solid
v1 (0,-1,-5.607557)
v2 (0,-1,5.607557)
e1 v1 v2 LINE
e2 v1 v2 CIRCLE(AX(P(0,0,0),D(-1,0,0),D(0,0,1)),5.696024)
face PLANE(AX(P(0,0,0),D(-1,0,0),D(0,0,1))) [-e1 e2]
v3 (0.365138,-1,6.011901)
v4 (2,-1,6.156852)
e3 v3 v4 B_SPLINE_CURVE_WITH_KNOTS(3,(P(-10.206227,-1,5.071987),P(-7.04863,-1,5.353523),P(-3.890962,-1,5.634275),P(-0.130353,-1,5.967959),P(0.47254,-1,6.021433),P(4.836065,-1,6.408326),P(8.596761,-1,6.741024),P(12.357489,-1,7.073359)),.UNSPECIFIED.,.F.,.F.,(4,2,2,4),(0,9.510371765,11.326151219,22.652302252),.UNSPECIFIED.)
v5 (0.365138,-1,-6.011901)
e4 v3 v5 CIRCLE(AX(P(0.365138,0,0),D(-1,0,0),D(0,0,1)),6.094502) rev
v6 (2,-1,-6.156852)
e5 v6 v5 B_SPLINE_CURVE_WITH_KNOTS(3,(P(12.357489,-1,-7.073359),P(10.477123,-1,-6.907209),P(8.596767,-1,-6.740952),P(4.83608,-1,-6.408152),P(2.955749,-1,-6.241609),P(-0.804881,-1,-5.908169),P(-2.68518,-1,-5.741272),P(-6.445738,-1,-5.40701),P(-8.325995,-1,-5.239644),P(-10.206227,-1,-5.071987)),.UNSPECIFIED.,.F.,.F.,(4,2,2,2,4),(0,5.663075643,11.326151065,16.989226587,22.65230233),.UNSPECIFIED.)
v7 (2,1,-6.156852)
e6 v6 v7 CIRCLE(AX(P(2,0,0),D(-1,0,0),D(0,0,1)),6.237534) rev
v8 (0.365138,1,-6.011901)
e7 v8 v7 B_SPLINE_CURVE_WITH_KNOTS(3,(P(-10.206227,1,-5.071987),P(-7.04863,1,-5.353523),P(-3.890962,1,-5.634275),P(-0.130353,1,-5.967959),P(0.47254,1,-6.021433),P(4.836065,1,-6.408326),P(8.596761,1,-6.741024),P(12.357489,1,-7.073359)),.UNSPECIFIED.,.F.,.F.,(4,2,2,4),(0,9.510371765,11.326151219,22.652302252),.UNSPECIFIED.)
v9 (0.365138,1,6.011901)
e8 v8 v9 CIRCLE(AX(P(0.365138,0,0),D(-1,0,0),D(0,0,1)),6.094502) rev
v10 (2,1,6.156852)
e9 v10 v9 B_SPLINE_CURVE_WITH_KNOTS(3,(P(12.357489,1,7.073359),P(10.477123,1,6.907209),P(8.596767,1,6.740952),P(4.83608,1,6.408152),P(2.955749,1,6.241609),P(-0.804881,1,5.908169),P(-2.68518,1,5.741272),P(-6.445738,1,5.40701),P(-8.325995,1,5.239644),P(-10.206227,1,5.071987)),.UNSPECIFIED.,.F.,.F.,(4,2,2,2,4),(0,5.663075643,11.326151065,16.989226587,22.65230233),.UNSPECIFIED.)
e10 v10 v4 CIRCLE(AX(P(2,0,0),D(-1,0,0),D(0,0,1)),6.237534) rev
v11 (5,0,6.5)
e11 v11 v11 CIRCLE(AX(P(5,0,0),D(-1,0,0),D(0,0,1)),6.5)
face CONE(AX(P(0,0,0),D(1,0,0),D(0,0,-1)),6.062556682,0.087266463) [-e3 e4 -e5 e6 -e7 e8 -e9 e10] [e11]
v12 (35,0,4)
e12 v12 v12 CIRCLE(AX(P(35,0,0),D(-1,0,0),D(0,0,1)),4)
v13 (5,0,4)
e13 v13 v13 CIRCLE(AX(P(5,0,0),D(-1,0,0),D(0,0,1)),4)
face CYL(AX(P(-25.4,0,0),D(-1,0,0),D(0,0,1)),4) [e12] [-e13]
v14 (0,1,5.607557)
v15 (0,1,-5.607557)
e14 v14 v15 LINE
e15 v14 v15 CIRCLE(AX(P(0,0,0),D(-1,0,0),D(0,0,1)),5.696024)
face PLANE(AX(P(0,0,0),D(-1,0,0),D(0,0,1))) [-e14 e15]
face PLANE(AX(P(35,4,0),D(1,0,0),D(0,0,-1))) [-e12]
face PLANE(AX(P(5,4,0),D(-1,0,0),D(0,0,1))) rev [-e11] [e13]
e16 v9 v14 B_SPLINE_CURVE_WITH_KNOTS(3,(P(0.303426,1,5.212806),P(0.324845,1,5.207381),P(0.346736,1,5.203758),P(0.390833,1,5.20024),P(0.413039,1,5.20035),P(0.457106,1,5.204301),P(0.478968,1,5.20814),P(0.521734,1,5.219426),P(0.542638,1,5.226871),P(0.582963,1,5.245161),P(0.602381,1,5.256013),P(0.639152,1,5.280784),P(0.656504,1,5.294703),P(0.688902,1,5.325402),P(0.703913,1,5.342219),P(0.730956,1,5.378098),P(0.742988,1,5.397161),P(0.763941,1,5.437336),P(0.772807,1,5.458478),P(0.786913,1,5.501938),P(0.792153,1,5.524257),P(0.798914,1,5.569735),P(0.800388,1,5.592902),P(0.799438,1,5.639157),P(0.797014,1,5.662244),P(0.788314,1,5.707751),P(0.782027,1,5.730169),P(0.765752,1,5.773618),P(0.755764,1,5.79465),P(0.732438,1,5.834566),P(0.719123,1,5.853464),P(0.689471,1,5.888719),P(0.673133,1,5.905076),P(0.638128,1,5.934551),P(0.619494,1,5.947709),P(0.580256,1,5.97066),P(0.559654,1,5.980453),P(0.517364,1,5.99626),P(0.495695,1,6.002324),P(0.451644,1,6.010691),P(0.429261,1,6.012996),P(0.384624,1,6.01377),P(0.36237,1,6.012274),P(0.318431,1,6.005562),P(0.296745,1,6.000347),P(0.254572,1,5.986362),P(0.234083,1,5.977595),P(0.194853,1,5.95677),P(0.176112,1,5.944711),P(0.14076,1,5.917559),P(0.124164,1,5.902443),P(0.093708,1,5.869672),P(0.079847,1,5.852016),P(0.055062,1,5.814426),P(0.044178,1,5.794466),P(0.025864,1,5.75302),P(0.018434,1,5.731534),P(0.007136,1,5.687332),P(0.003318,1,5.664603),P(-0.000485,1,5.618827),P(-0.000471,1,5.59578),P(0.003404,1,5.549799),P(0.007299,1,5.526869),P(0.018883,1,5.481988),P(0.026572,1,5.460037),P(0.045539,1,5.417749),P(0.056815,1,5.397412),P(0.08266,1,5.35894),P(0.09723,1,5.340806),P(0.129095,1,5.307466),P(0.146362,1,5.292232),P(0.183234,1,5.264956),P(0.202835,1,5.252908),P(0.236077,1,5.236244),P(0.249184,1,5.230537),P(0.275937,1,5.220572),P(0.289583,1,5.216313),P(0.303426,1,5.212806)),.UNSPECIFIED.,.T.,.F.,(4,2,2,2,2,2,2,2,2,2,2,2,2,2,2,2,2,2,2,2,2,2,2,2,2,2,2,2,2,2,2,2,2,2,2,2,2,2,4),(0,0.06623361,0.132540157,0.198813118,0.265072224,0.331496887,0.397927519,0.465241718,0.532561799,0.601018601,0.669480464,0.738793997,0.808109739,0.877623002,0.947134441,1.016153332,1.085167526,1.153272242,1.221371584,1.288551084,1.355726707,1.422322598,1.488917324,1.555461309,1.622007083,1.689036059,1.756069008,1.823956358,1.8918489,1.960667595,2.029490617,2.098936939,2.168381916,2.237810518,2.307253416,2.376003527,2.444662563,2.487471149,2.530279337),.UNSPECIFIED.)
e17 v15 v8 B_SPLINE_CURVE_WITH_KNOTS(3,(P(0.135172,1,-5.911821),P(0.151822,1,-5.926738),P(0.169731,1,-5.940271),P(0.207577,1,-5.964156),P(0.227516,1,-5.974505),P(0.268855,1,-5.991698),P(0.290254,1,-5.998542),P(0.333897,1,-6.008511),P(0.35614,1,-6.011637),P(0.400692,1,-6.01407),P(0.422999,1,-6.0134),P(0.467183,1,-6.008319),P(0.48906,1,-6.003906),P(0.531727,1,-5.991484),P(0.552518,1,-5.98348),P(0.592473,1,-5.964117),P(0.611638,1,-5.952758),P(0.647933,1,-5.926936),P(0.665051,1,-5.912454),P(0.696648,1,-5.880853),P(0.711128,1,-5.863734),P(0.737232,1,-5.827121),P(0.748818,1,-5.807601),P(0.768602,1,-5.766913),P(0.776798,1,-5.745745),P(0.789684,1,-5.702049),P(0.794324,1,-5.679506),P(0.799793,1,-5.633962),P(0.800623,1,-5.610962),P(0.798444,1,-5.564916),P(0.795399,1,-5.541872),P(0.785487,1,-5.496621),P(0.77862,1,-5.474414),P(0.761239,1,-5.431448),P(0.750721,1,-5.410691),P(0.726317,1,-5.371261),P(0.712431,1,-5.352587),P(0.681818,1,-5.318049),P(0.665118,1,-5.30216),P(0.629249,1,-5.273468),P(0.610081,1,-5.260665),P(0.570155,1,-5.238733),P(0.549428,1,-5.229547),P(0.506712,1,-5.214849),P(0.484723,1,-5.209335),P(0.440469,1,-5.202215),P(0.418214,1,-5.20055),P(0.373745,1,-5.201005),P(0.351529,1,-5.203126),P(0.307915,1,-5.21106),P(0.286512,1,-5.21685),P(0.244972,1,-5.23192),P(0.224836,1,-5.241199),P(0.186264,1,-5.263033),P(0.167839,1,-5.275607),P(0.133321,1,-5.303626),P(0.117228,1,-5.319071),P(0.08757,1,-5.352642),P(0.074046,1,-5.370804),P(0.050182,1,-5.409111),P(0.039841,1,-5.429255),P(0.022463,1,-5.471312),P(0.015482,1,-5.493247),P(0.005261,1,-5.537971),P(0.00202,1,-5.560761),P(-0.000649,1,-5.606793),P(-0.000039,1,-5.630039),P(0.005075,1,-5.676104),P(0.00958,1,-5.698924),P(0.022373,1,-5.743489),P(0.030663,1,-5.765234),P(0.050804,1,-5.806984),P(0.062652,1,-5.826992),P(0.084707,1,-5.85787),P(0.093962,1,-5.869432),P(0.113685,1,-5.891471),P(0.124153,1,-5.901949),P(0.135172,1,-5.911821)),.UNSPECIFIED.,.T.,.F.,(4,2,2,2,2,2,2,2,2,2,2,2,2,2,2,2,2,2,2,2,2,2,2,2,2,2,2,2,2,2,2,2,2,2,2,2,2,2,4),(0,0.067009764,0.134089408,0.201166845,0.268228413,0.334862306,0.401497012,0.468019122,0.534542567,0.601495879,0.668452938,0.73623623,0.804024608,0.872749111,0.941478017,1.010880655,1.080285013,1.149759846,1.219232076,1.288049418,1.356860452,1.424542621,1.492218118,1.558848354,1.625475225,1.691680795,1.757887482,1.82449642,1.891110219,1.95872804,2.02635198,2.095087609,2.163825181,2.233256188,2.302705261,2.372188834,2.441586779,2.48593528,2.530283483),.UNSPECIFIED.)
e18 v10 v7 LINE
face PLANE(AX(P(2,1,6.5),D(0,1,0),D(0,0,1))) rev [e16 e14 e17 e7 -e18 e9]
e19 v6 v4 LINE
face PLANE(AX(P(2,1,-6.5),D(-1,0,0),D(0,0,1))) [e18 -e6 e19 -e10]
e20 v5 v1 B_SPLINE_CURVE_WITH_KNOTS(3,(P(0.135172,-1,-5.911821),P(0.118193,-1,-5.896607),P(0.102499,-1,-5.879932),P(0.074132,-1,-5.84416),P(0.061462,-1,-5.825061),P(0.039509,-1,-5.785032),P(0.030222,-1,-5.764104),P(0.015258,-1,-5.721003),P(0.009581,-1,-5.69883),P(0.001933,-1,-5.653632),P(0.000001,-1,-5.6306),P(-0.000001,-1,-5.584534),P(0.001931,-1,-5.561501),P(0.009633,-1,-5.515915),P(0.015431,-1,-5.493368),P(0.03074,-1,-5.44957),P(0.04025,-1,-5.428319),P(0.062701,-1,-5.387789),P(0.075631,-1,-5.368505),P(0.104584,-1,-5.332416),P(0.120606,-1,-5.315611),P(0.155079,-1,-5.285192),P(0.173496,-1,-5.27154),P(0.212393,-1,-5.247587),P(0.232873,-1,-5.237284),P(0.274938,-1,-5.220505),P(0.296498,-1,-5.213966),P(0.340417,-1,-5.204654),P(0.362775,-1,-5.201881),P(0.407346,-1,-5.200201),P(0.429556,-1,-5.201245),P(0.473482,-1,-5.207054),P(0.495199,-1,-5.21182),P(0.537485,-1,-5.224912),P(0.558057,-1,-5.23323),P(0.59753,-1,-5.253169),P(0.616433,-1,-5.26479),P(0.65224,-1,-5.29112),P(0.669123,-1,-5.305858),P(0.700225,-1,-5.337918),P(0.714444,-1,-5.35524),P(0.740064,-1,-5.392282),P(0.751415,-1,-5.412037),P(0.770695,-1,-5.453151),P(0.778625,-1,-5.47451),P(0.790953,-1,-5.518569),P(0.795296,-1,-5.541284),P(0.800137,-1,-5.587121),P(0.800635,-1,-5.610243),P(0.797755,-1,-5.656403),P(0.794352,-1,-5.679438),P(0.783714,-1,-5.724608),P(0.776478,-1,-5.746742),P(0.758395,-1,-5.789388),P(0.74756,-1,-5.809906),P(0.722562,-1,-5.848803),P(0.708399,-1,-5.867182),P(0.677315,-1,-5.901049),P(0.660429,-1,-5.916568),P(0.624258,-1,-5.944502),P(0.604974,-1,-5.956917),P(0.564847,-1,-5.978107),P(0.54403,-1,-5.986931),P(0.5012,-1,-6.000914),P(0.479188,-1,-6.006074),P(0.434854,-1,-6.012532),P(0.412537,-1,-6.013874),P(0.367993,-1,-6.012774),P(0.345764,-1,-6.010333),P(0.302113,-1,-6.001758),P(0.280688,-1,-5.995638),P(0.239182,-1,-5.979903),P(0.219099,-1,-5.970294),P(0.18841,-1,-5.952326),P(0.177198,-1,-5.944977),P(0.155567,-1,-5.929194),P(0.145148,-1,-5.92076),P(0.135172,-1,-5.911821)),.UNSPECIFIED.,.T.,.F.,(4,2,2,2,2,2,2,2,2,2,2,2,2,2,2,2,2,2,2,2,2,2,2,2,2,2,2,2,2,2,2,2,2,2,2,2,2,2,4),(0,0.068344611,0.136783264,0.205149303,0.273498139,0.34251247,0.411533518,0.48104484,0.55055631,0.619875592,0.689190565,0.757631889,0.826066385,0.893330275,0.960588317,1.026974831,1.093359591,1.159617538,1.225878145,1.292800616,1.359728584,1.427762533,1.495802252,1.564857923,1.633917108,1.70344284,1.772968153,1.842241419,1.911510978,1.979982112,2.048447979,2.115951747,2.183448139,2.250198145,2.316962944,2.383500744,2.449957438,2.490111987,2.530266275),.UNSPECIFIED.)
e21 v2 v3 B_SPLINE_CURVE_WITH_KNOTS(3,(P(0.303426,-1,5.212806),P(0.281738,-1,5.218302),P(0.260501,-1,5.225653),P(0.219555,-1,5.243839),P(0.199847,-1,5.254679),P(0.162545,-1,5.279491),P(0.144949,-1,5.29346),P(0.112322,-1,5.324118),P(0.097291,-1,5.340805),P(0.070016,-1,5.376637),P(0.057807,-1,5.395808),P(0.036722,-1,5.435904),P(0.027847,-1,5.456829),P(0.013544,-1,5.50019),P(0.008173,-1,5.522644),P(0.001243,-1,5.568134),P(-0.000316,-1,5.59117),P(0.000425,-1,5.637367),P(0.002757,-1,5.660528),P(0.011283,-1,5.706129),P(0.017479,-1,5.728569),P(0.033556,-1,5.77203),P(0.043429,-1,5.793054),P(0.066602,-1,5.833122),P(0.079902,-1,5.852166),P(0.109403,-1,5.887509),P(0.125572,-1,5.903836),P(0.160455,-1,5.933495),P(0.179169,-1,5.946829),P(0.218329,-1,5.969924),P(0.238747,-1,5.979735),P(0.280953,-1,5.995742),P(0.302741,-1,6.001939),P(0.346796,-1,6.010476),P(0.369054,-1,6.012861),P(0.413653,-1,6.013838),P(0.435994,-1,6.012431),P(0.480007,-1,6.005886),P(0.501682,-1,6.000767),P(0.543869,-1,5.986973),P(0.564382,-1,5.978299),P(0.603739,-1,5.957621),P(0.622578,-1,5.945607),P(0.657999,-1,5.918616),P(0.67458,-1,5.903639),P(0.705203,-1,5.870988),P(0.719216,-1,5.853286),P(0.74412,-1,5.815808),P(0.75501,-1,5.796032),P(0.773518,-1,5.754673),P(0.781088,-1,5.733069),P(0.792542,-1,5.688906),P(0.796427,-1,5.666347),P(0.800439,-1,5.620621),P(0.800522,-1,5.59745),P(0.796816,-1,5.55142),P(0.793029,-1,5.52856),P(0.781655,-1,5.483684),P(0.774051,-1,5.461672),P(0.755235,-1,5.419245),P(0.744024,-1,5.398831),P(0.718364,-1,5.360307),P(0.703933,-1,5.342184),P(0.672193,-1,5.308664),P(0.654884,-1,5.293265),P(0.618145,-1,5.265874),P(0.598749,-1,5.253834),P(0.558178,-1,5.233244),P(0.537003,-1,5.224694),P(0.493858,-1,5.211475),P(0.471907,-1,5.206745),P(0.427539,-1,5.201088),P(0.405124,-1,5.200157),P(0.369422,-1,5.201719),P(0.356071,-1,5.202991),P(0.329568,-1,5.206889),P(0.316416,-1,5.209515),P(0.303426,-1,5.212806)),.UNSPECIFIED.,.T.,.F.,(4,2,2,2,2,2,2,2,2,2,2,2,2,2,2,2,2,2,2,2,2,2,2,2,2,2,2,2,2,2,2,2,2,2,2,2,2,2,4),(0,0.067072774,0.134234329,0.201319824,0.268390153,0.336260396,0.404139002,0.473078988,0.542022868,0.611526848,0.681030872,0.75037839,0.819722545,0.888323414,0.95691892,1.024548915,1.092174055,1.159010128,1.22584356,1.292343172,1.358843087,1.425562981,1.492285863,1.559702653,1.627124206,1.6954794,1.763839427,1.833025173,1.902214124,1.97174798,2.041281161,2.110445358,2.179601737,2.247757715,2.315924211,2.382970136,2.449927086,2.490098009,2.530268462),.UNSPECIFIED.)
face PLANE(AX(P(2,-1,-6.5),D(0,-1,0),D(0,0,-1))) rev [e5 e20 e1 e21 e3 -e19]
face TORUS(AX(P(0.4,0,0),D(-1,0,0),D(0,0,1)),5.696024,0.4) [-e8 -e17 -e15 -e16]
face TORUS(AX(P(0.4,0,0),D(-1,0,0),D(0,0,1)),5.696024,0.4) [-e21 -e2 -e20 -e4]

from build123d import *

# Parameters (mm, degrees)
SKETCH2_W  = 13
SKETCH2_H  = 2
SLOT_DEPTH = 2


with BuildPart() as part:
    # Fillet2: read off the stored shape, not the designer's step
    # Fillet2 outline → Fillet2 (revolve)
    with BuildSketch(Plane.YX):
        with BuildLine():
            Line((4, 5), (4, 35))
            Line((4, 35), (0, 35))
            Line((0, 35), (0, 0))
            Line((0, 0), (5.696024213, 0))
            ThreePointArc((5.696024213, 0), (5.966260296, 0.105089065), (6.094502092, 0.365137703))
            Line((6.094502092, 0.365137703), (6.5, 5))
            Line((6.5, 5), (4, 5))
        make_face()
    revolve(axis=Axis((0, 0, 0), (1, 0, 0)))

    # Sketch2 → Slot (cut)
    with BuildSketch(Plane(origin=(0, 0, 0), x_dir=(0, 0, -1), z_dir=(1, 0, 0))):
        Rectangle(SKETCH2_W, SKETCH2_H)
    extrude(amount=SLOT_DEPTH, mode=Mode.SUBTRACT)


solid = part.part
